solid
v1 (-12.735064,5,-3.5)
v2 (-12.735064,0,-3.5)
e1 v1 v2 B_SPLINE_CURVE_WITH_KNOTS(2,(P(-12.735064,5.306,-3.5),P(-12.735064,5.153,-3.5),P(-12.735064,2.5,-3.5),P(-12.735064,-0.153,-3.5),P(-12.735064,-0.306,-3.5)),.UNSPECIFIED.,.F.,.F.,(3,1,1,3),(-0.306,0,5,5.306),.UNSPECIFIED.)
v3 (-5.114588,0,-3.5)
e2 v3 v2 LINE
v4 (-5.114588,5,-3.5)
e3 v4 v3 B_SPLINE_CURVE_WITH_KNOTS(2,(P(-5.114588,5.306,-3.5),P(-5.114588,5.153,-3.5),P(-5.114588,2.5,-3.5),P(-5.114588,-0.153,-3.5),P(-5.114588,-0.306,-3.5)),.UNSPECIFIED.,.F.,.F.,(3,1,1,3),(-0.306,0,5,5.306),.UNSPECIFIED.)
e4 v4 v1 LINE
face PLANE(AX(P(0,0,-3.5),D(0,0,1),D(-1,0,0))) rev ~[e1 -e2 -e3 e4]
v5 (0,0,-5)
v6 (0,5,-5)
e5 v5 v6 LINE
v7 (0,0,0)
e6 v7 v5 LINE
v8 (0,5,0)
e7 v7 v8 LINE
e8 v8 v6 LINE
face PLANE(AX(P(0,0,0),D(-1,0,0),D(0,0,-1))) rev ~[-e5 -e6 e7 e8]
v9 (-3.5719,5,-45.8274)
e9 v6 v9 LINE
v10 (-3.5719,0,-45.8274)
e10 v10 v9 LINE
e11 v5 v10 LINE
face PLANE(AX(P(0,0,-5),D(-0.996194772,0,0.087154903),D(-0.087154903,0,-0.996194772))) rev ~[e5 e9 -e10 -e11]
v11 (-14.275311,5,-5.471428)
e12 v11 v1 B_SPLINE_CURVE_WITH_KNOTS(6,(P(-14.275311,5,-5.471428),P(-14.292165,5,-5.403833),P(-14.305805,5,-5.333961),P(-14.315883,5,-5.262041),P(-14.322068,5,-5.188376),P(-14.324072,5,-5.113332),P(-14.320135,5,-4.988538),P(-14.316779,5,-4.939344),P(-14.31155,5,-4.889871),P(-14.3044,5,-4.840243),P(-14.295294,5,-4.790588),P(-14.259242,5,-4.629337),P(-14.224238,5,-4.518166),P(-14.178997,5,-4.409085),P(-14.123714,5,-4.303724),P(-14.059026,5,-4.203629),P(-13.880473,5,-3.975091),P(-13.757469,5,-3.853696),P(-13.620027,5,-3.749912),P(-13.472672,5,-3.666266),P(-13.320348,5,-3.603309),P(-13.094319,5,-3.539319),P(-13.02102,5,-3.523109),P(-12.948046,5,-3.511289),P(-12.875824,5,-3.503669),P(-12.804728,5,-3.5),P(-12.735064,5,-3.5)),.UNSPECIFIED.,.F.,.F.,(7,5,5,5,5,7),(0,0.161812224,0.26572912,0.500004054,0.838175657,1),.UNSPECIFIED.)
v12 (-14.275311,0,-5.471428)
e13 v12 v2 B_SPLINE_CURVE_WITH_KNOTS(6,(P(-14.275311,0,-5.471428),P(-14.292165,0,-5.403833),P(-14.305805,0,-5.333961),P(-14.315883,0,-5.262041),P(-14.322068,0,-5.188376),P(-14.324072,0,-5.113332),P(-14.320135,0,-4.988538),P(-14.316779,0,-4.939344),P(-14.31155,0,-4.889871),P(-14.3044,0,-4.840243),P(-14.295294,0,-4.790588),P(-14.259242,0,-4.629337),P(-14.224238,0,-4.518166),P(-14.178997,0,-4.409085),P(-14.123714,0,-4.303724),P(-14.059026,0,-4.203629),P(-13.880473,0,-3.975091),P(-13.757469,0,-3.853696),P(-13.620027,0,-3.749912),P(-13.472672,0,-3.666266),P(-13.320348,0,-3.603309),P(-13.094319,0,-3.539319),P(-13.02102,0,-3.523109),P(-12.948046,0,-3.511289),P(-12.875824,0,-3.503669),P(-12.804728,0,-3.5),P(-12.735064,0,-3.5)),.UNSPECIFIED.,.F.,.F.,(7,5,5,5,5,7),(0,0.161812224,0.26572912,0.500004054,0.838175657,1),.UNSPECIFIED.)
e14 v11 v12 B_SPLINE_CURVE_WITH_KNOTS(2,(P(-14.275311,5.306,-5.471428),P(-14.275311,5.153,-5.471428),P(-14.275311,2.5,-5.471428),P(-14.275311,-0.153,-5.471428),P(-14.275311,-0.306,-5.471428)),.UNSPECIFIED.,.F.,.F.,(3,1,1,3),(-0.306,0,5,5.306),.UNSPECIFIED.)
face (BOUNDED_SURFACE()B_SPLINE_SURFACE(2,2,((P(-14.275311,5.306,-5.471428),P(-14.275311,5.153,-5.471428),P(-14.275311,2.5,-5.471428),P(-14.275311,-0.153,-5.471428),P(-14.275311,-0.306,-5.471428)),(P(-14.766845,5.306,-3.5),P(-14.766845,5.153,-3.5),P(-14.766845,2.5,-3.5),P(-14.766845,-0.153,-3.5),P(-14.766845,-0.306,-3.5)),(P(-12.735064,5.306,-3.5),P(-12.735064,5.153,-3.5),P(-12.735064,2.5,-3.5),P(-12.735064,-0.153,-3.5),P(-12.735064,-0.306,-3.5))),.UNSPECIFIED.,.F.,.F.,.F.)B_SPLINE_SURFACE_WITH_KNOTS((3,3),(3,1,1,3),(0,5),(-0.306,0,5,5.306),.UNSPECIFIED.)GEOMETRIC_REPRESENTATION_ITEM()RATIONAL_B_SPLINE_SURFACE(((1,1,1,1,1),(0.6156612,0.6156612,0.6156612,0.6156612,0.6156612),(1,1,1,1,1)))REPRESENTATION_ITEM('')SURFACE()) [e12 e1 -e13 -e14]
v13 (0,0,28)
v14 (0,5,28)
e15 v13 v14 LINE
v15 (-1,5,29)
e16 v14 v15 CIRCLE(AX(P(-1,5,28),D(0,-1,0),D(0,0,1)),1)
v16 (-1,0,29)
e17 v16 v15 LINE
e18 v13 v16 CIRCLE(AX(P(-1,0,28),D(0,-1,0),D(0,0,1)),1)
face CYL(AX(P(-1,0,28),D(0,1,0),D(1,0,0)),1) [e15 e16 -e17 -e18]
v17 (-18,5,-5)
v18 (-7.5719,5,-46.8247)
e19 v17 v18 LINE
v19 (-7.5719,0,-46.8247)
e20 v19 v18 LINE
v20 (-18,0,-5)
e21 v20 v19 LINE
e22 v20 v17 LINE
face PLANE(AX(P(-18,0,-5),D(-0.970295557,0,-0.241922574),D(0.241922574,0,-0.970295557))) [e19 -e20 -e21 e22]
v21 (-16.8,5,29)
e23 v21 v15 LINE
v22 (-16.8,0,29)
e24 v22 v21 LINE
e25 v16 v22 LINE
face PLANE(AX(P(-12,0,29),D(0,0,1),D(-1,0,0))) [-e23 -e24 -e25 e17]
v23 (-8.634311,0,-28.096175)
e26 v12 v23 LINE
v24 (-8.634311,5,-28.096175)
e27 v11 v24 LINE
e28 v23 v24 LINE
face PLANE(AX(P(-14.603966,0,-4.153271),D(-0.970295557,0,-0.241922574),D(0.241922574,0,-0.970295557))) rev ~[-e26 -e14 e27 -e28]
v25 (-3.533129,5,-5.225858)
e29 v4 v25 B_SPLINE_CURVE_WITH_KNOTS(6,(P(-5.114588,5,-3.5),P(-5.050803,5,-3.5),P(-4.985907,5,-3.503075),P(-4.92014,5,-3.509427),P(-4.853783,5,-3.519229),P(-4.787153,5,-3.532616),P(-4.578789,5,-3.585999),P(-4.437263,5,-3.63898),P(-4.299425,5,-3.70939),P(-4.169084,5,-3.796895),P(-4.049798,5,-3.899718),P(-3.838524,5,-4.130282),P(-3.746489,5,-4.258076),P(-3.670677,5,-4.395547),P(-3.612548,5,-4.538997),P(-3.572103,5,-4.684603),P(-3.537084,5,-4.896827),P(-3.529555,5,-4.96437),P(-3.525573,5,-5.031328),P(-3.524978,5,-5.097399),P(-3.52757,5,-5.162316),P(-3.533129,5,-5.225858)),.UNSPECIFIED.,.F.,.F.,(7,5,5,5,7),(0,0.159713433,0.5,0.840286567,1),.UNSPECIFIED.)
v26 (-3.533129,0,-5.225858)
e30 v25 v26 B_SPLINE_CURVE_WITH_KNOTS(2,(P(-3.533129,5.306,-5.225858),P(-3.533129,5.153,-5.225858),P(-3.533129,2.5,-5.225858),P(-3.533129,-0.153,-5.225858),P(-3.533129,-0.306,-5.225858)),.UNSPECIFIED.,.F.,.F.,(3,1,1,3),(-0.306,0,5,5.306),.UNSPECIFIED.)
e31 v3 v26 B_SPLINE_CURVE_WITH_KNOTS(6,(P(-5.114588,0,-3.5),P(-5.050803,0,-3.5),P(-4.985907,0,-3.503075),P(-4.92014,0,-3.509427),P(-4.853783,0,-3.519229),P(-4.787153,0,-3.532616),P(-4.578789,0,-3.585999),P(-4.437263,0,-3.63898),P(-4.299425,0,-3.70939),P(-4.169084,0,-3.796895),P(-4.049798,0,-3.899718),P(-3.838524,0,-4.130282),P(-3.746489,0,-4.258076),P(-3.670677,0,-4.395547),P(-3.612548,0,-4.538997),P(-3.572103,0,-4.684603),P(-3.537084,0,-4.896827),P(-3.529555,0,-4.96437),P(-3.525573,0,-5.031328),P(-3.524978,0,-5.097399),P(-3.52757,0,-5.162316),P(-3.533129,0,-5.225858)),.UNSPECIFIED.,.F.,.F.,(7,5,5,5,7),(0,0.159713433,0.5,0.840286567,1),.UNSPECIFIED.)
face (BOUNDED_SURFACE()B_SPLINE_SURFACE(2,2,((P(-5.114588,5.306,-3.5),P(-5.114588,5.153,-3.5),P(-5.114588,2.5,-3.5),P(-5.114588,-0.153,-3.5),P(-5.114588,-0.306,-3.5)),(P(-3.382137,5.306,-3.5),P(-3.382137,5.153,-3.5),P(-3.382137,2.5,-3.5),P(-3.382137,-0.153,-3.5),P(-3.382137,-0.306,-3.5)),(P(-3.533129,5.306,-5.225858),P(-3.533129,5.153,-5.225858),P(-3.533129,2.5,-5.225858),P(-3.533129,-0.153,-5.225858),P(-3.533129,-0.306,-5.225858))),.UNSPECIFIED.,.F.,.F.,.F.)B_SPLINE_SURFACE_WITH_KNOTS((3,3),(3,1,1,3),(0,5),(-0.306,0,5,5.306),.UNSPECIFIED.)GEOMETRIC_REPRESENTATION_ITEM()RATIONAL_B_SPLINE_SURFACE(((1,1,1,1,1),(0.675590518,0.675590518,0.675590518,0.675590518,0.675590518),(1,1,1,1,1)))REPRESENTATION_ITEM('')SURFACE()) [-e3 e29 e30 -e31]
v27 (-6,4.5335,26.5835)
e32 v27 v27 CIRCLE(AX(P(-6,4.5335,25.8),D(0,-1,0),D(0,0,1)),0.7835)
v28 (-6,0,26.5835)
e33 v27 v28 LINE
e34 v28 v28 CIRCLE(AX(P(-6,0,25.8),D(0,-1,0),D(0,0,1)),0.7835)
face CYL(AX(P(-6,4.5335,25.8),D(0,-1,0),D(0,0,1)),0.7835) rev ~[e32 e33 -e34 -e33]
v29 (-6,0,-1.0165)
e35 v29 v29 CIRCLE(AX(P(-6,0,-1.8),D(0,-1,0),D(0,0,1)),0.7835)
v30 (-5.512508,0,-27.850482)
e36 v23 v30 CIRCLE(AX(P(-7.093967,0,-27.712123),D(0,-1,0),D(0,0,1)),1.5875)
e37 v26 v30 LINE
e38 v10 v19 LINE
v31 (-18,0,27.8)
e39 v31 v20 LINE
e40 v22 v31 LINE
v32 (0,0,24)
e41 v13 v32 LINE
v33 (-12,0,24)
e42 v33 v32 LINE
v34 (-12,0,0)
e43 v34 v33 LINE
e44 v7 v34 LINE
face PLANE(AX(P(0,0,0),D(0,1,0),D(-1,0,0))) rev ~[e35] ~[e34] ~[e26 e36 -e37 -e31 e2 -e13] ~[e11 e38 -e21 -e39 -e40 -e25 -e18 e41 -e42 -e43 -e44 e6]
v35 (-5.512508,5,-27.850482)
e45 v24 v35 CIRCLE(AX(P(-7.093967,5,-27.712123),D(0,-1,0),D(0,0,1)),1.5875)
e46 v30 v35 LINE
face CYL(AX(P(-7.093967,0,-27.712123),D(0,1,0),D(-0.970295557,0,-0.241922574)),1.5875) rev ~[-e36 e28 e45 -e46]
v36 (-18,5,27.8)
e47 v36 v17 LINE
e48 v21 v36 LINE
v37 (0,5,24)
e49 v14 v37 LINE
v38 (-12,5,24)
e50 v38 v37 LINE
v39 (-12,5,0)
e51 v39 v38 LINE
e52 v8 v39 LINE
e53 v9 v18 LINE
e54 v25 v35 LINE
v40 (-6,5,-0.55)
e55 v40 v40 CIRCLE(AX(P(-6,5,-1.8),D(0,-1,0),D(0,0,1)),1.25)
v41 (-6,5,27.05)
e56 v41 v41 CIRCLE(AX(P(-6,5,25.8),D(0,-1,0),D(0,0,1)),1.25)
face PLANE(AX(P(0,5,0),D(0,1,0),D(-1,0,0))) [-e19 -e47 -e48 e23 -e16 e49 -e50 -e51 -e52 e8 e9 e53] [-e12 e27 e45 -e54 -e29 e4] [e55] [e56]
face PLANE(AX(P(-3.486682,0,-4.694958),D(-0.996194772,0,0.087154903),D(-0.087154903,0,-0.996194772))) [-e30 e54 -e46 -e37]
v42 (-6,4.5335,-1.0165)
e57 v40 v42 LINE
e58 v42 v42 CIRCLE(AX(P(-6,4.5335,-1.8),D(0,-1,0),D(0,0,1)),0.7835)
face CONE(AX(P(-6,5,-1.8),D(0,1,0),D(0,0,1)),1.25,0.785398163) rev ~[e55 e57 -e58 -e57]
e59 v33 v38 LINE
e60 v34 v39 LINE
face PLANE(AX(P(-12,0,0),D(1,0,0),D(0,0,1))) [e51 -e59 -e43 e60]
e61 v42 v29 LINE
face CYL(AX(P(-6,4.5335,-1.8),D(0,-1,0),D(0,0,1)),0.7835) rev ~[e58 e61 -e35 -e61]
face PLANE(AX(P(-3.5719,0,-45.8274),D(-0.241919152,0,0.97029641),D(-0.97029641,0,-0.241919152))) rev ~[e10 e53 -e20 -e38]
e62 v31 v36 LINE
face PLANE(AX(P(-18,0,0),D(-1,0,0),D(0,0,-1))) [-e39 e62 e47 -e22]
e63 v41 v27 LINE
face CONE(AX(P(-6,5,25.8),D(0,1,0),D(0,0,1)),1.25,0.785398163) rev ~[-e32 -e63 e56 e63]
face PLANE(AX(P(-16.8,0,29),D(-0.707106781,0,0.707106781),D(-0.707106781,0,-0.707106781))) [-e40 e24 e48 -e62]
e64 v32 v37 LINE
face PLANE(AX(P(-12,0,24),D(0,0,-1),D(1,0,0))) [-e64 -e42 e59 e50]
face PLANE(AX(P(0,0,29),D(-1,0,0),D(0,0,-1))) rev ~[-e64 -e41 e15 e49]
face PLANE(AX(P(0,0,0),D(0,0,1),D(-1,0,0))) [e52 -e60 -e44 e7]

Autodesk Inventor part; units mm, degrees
ref_plane "YZ Plane" through (0, 0, 0) normal (1, 0, 0) x (0, 1, 0)
ref_plane "XZ Plane" through (0, 0, 0) normal (0, 1, 0) x (-1, 0, 0)
ref_plane "XY Plane" through (0, 0, 0) normal (0, 0, 1) x (1, 0, 0)
sketch "Sketch1" plane through (0, 0, 0) normal (0, 1, 0) x (-1, 0, 0)
  line L0 (0, 0) -> (18, 0)
  line L1 (0, 0) -> (0, -5)
  line L2 (0, -5) -> (3.5719, -45.8274)
  line L3 (18, 0) -> (18, -5)
  line L4 (18, -5) -> (7.5719, -46.8247)
  line L5 (3.5719, -45.8274) -> (7.5719, -46.8247)
  dimension "d0" = 18
  dimension "d1" = 5
  dimension "d3" = 175
  dimension "d6" = 76
  dimension "d7" = 4
extrude "Extrusion1" add sketch "Sketch1" along normal blind 5
shell "Shell1" thickness 3.5 removed faces 2 at (-7.1906, 5, -18.6091) at (-7.1906, 0, -18.6091)
fillet "Fillet1" radius 1.5875 5 edges at (-3.5, 2.5, -4.8472) (-6.3393, 2.5, -37.3009) (-3.5, 2.5, -3.5) (-14.5, 2.5, -3.5) (-14.5, 2.5, -4.5703)
sketch "Sketch2" plane through (0, 0, 0) normal (0, -1, 0) x (1, 0, 0)
  line L0 (0, 0) -> (-12, 0)
  line L1 (-12, 0) -> (-12, 24)
  line L2 (-12, 24) -> (0, 24)
  line L3 (0, 24) -> (0, 0)
  line L4 (0, 24) -> (-12, 24)
  line L5 (-12, 24) -> (-12, 29)
  line L6 (-12, 29) -> (0, 29)
  line L7 (0, 29) -> (0, 24)
  line L8 (-12, 0) -> (-18, 0)
  line L9 (-18, 0) -> (-18, 24)
  line L10 (-18, 24) -> (-12, 24)
  line L11 (-12, 24) -> (-12, 0)
  line L12 (-18, 24) -> (-13.7574, 24) construction
  line L13 (-12, 29) -> (-16.8, 29)
  line L14 (-16.8, 29) -> (-18, 27.8)
  line L15 (-18, 27.8) -> (-18, 24)
  dimension "d14" = 24
  dimension "d15" = 5
  dimension "d16" = 12
  dimension "d18" = 6
  dimension "d57" = 1.2
  dimension "d58" = 135
extrude "Extrusion2" add sketch "Sketch2" against normal blind 5 contours L8 L9 L10 L1 | L2 L5 L6 L7 | L10 L15 L14 L13 L5
fillet "Fillet3" radius 1 1 edges at (0, 2.5, 29)
sketch "Sketch4" plane through (0, 5, 0) normal (0, 1, 0) x (1, 0, 0)
  line L0 (-12, -24) -> (-12, 0) projected
  line L1 (-12, -12) -> (-18, -12)
  line L2 (-18, 5) -> (-18, -29) projected
  line L3 (0, -24) -> (-12, -24) projected
  line L4 (-12, 0) -> (0, 0) projected
  circle A0 centre (-6, -25.8) radius 0.8
  circle A1 centre (-6, 1.8) radius 0.8
  line L5 (0, -28) -> (0, -24) projected
  point P0 (-18, 1.9304)
  point P1 (-18, -27.8)
  point P2 (-16.8, -29)
  dimension "d31" = 1.6
  dimension "d32" = 27.6
  dimension "d43" = 6
  dimension "d46" = 13.8
hole "Hole1" at (-6, 5, 25.8) at (-6, 5, -1.8) direction (0, -1, 0) diameter 1.567 depth 10 countersink diameter 2.5 countersink angle 90 thread size "M2x0.4" class "6H" standard "ISO Metric profile"
sketch "Sketch17" plane through (0, 5, 0) normal (0, 1, 0) x (1, 0, 0)
  line L0 (-15.0964, 25.5) -> (0.714, 25.5)
  line L1 (-12, 0) -> (0, 0) projected
  line L2 (-5.1146, 3.5) -> (-12.7349, 3.5) projected
  line L3 (0.714, 25.5) -> (-0.9097, 44.0597)
  line L4 (-15.0964, 25.5) -> (-10.3033, 44.7241)
  line L5 (0, 5) -> (-3.5719, 45.8274) projected
  line L6 (-7.5719, 46.8247) -> (-18, 5) projected
  line L7 (-4.6811, 48.4754) -> (-4.2422, 48.3659)
  line L8 (-3.5719, 45.8274) -> (-7.5719, 46.8247) projected
  arc A0 (-0.9097, 44.0597) -> (-4.6811, 48.4754) centre (-5.8907, 43.6239) ccw
  arc A1 (-4.2422, 48.3659) -> (-10.3033, 44.7241) centre (-5.4518, 43.5145) ccw
  point P0 (-8.9248, 3.5)
  point P1 (-4.4629, 48.4157)
  dimension "d152" = 22
  dimension "d153" = 2.498
  dimension "d154" = 2.142
  dimension "d155" = 2.301
  dimension "d156" = 5
extrude "Extrusion13" [suppressed]
sketch "Sketch18" plane through (-15.4653, 7.5, -25.5) normal (0, 0, 1) x (1, 0, 0)
  line L0 (16.1813, -10) -> (16.1813, 0) construction
  line L1 (4.8628, 0) -> (0, 0) construction
  line L2 (16.1813, -10) -> (0, 0) construction
  line L3 (0, -10) -> (0, 0) construction
  line L4 (16.1813, 0) -> (0, -10) construction
  line L5 (23.0907, 2.5) -> (-6.9093, 2.5)
  line L6 (-6.9093, 2.5) -> (-6.9093, -12.5)
  line L7 (-6.9093, -12.5) -> (23.0907, -12.5)
  line L8 (23.0907, -12.5) -> (23.0907, 2.5)
  line L9 (23.0907, 2.5) -> (-6.9093, -12.5) construction
  line L10 (-6.9093, 2.5) -> (23.0907, -12.5) construction
  point P0 (15.4653, -7.5)
  point P1 (8.0907, -5)
  dimension "d161" = 25
  dimension "d162" = 15
extrude "Extrusion14" [suppressed]
combine "Combine8" [suppressed]
extrude "Extrusion15" [suppressed]
combine "Combine9" [suppressed]
combine "Combine10" [suppressed]
sketch "Sketch20" plane through (-15.4653, 7.5, -21.5) normal (0, 0, 1) x (1, 0, 0)
  line L0 (10.1584, -7.5) -> (13.6718, -7.5) projected
  line L1 (6.1837, -2.5) -> (2.5765, -2.5) projected
  line L2 (11.871, -7.5) -> (3.871, -7.5)
  line L3 (3.871, -7.5) -> (3.871, -2.5)
  line L4 (3.871, -2.5) -> (11.871, -2.5)
  line L5 (11.871, -2.5) -> (11.871, -7.5)
  circle A0 centre (19.0907, -8.5) radius 1
  line L6 (23.0907, -12.5) -> (-6.9093, -12.5) construction
  circle A1 centre (-2.9093, -1.5) radius 1
  line L7 (23.0907, -12.5) -> (23.0907, 2.5) construction
  line L8 (23.0907, 2.5) -> (-6.9093, 2.5) construction
  line L9 (11.871, -7.5) -> (3.871, -7.5)
  line L10 (3.871, -7.5) -> (3.871, -10)
  line L11 (3.871, -10) -> (11.871, -10)
  line L12 (11.871, -10) -> (11.871, -7.5)
  line L13 (11.871, -2.5) -> (3.871, -2.5)
  line L14 (3.871, -2.5) -> (3.871, 0)
  line L15 (3.871, 0) -> (11.871, 0)
  line L16 (11.871, 0) -> (11.871, -2.5)
  line L17 (-6.9093, 2.5) -> (-6.9093, -12.5) projected
  point P0 (15.4653, -7.5)
  point P1 (23.0907, -5)
  point P2 (23.0907, -5)
  dimension "d167" = 9.224
  dimension "d168" = 3.5943
  dimension "d171" = 2
  dimension "d173" = 7.5
  dimension "d175" = 4.22
  dimension "d181" = 2.5
  dimension "d185" = 8
  dimension "d186" = 2.5
  dimension "d202" = 15
  dimension "d203" = 11
  dimension "d204" = 3.561
  dimension "d205" = 2
extrude "Extrusion16" [suppressed]
extrude "Extrusion17" [suppressed]
chamfer "Chamfer2" [suppressed]
chamfer "Chamfer3" [suppressed]
chamfer "Chamfer4" [suppressed]
chamfer "Chamfer5" [suppressed]
sketch "Sketch21" plane through (-15.4653, 7.5, -25.5) normal (0, 0, 1) x (1, 0, 0)
  line L0 (23.0907, 2.5) -> (-6.9093, 2.5) projected
  line L1 (-6.9093, 2.5) -> (-6.9093, -10.5) projected
  line L2 (23.0907, 2.5) -> (-6.9093, 2.5)
  line L3 (-6.9093, 2.5) -> (-6.9093, -5)
  line L4 (-6.9093, -5) -> (23.0907, -5)
  line L5 (23.0907, -5) -> (23.0907, 2.5)
  point P0 (15.4653, -7.5)
  dimension "d194" = 7.5
extrude "Extrusion18" [suppressed]
extrude "Extrusion19" [suppressed]
combine "Combine11" [suppressed]
sketch "Sketch22" plane through (-15.4653, 7.5, -25.5) normal (0, 0, 1) x (1, 0, 0)
  circle A0 centre (-2.9093, -1.5) radius 1 construction
  line L0 (-2.9093, -2.5) -> (-2.9093, -1.5) construction
  circle A1 centre (-2.9093, -1.5) radius 1
  point P0 (15.4653, -7.5)
extrude "Extrusion20" [suppressed]
chamfer "Chamfer7" [suppressed]
sketch "Sketch23" plane through (7.6254, 10, -60.5) normal (0, 0, -1) x (-1, 0, 0)
  line L0 (30, -7.5) -> (3.5, -7.5) projected
  line L1 (30, -7.5) -> (30, -11)
  line L2 (26.5, -7.5) -> (30, -11) projected
  line L3 (30, -11) -> (26.5, -7.5)
  line L4 (26.5, -7.5) -> (30, -7.5)
  line L5 (0, -4) -> (3.5, -7.5) projected
  line L6 (3.5, -7.5) -> (0, -7.5)
  line L7 (0, -7.5) -> (0, -4)
  line L8 (0, -4) -> (3.5, -7.5)
  point P0 (7.6254, -10)
extrude "Extrusion21" [suppressed]
extrude "Extrusion22" [suppressed]
combine "Combine12" [suppressed]
combine "Combine13" [suppressed]
fillet "Fillet6" [suppressed]
sketch "Sketch24" plane through (-22.3746, 10, -25.5) normal (0, 1, 0) x (1, 0, 0)
  circle A0 centre (24, 29) radius 1
  line L0 (30, 35) -> (0, 35) projected
  line L1 (30, 0) -> (30, 35) projected
  circle A1 centre (24, 11) radius 1
  circle A2 centre (6, 29) radius 1
  circle A3 centre (6, 11) radius 1
  point P0 (22.3746, -25.5)
  dimension "d216" = 2
  dimension "d217" = 4.064
  dimension "d218" = 4.147
  dimension "d221" = 18
  dimension "d224" = 20
extrude "Extrusion23" [suppressed]
extrude "Extrusion24" [suppressed]
chamfer "Chamfer8" [suppressed]
chamfer "Chamfer9" [suppressed]
properties part number "CAM3D_3D tisk"
